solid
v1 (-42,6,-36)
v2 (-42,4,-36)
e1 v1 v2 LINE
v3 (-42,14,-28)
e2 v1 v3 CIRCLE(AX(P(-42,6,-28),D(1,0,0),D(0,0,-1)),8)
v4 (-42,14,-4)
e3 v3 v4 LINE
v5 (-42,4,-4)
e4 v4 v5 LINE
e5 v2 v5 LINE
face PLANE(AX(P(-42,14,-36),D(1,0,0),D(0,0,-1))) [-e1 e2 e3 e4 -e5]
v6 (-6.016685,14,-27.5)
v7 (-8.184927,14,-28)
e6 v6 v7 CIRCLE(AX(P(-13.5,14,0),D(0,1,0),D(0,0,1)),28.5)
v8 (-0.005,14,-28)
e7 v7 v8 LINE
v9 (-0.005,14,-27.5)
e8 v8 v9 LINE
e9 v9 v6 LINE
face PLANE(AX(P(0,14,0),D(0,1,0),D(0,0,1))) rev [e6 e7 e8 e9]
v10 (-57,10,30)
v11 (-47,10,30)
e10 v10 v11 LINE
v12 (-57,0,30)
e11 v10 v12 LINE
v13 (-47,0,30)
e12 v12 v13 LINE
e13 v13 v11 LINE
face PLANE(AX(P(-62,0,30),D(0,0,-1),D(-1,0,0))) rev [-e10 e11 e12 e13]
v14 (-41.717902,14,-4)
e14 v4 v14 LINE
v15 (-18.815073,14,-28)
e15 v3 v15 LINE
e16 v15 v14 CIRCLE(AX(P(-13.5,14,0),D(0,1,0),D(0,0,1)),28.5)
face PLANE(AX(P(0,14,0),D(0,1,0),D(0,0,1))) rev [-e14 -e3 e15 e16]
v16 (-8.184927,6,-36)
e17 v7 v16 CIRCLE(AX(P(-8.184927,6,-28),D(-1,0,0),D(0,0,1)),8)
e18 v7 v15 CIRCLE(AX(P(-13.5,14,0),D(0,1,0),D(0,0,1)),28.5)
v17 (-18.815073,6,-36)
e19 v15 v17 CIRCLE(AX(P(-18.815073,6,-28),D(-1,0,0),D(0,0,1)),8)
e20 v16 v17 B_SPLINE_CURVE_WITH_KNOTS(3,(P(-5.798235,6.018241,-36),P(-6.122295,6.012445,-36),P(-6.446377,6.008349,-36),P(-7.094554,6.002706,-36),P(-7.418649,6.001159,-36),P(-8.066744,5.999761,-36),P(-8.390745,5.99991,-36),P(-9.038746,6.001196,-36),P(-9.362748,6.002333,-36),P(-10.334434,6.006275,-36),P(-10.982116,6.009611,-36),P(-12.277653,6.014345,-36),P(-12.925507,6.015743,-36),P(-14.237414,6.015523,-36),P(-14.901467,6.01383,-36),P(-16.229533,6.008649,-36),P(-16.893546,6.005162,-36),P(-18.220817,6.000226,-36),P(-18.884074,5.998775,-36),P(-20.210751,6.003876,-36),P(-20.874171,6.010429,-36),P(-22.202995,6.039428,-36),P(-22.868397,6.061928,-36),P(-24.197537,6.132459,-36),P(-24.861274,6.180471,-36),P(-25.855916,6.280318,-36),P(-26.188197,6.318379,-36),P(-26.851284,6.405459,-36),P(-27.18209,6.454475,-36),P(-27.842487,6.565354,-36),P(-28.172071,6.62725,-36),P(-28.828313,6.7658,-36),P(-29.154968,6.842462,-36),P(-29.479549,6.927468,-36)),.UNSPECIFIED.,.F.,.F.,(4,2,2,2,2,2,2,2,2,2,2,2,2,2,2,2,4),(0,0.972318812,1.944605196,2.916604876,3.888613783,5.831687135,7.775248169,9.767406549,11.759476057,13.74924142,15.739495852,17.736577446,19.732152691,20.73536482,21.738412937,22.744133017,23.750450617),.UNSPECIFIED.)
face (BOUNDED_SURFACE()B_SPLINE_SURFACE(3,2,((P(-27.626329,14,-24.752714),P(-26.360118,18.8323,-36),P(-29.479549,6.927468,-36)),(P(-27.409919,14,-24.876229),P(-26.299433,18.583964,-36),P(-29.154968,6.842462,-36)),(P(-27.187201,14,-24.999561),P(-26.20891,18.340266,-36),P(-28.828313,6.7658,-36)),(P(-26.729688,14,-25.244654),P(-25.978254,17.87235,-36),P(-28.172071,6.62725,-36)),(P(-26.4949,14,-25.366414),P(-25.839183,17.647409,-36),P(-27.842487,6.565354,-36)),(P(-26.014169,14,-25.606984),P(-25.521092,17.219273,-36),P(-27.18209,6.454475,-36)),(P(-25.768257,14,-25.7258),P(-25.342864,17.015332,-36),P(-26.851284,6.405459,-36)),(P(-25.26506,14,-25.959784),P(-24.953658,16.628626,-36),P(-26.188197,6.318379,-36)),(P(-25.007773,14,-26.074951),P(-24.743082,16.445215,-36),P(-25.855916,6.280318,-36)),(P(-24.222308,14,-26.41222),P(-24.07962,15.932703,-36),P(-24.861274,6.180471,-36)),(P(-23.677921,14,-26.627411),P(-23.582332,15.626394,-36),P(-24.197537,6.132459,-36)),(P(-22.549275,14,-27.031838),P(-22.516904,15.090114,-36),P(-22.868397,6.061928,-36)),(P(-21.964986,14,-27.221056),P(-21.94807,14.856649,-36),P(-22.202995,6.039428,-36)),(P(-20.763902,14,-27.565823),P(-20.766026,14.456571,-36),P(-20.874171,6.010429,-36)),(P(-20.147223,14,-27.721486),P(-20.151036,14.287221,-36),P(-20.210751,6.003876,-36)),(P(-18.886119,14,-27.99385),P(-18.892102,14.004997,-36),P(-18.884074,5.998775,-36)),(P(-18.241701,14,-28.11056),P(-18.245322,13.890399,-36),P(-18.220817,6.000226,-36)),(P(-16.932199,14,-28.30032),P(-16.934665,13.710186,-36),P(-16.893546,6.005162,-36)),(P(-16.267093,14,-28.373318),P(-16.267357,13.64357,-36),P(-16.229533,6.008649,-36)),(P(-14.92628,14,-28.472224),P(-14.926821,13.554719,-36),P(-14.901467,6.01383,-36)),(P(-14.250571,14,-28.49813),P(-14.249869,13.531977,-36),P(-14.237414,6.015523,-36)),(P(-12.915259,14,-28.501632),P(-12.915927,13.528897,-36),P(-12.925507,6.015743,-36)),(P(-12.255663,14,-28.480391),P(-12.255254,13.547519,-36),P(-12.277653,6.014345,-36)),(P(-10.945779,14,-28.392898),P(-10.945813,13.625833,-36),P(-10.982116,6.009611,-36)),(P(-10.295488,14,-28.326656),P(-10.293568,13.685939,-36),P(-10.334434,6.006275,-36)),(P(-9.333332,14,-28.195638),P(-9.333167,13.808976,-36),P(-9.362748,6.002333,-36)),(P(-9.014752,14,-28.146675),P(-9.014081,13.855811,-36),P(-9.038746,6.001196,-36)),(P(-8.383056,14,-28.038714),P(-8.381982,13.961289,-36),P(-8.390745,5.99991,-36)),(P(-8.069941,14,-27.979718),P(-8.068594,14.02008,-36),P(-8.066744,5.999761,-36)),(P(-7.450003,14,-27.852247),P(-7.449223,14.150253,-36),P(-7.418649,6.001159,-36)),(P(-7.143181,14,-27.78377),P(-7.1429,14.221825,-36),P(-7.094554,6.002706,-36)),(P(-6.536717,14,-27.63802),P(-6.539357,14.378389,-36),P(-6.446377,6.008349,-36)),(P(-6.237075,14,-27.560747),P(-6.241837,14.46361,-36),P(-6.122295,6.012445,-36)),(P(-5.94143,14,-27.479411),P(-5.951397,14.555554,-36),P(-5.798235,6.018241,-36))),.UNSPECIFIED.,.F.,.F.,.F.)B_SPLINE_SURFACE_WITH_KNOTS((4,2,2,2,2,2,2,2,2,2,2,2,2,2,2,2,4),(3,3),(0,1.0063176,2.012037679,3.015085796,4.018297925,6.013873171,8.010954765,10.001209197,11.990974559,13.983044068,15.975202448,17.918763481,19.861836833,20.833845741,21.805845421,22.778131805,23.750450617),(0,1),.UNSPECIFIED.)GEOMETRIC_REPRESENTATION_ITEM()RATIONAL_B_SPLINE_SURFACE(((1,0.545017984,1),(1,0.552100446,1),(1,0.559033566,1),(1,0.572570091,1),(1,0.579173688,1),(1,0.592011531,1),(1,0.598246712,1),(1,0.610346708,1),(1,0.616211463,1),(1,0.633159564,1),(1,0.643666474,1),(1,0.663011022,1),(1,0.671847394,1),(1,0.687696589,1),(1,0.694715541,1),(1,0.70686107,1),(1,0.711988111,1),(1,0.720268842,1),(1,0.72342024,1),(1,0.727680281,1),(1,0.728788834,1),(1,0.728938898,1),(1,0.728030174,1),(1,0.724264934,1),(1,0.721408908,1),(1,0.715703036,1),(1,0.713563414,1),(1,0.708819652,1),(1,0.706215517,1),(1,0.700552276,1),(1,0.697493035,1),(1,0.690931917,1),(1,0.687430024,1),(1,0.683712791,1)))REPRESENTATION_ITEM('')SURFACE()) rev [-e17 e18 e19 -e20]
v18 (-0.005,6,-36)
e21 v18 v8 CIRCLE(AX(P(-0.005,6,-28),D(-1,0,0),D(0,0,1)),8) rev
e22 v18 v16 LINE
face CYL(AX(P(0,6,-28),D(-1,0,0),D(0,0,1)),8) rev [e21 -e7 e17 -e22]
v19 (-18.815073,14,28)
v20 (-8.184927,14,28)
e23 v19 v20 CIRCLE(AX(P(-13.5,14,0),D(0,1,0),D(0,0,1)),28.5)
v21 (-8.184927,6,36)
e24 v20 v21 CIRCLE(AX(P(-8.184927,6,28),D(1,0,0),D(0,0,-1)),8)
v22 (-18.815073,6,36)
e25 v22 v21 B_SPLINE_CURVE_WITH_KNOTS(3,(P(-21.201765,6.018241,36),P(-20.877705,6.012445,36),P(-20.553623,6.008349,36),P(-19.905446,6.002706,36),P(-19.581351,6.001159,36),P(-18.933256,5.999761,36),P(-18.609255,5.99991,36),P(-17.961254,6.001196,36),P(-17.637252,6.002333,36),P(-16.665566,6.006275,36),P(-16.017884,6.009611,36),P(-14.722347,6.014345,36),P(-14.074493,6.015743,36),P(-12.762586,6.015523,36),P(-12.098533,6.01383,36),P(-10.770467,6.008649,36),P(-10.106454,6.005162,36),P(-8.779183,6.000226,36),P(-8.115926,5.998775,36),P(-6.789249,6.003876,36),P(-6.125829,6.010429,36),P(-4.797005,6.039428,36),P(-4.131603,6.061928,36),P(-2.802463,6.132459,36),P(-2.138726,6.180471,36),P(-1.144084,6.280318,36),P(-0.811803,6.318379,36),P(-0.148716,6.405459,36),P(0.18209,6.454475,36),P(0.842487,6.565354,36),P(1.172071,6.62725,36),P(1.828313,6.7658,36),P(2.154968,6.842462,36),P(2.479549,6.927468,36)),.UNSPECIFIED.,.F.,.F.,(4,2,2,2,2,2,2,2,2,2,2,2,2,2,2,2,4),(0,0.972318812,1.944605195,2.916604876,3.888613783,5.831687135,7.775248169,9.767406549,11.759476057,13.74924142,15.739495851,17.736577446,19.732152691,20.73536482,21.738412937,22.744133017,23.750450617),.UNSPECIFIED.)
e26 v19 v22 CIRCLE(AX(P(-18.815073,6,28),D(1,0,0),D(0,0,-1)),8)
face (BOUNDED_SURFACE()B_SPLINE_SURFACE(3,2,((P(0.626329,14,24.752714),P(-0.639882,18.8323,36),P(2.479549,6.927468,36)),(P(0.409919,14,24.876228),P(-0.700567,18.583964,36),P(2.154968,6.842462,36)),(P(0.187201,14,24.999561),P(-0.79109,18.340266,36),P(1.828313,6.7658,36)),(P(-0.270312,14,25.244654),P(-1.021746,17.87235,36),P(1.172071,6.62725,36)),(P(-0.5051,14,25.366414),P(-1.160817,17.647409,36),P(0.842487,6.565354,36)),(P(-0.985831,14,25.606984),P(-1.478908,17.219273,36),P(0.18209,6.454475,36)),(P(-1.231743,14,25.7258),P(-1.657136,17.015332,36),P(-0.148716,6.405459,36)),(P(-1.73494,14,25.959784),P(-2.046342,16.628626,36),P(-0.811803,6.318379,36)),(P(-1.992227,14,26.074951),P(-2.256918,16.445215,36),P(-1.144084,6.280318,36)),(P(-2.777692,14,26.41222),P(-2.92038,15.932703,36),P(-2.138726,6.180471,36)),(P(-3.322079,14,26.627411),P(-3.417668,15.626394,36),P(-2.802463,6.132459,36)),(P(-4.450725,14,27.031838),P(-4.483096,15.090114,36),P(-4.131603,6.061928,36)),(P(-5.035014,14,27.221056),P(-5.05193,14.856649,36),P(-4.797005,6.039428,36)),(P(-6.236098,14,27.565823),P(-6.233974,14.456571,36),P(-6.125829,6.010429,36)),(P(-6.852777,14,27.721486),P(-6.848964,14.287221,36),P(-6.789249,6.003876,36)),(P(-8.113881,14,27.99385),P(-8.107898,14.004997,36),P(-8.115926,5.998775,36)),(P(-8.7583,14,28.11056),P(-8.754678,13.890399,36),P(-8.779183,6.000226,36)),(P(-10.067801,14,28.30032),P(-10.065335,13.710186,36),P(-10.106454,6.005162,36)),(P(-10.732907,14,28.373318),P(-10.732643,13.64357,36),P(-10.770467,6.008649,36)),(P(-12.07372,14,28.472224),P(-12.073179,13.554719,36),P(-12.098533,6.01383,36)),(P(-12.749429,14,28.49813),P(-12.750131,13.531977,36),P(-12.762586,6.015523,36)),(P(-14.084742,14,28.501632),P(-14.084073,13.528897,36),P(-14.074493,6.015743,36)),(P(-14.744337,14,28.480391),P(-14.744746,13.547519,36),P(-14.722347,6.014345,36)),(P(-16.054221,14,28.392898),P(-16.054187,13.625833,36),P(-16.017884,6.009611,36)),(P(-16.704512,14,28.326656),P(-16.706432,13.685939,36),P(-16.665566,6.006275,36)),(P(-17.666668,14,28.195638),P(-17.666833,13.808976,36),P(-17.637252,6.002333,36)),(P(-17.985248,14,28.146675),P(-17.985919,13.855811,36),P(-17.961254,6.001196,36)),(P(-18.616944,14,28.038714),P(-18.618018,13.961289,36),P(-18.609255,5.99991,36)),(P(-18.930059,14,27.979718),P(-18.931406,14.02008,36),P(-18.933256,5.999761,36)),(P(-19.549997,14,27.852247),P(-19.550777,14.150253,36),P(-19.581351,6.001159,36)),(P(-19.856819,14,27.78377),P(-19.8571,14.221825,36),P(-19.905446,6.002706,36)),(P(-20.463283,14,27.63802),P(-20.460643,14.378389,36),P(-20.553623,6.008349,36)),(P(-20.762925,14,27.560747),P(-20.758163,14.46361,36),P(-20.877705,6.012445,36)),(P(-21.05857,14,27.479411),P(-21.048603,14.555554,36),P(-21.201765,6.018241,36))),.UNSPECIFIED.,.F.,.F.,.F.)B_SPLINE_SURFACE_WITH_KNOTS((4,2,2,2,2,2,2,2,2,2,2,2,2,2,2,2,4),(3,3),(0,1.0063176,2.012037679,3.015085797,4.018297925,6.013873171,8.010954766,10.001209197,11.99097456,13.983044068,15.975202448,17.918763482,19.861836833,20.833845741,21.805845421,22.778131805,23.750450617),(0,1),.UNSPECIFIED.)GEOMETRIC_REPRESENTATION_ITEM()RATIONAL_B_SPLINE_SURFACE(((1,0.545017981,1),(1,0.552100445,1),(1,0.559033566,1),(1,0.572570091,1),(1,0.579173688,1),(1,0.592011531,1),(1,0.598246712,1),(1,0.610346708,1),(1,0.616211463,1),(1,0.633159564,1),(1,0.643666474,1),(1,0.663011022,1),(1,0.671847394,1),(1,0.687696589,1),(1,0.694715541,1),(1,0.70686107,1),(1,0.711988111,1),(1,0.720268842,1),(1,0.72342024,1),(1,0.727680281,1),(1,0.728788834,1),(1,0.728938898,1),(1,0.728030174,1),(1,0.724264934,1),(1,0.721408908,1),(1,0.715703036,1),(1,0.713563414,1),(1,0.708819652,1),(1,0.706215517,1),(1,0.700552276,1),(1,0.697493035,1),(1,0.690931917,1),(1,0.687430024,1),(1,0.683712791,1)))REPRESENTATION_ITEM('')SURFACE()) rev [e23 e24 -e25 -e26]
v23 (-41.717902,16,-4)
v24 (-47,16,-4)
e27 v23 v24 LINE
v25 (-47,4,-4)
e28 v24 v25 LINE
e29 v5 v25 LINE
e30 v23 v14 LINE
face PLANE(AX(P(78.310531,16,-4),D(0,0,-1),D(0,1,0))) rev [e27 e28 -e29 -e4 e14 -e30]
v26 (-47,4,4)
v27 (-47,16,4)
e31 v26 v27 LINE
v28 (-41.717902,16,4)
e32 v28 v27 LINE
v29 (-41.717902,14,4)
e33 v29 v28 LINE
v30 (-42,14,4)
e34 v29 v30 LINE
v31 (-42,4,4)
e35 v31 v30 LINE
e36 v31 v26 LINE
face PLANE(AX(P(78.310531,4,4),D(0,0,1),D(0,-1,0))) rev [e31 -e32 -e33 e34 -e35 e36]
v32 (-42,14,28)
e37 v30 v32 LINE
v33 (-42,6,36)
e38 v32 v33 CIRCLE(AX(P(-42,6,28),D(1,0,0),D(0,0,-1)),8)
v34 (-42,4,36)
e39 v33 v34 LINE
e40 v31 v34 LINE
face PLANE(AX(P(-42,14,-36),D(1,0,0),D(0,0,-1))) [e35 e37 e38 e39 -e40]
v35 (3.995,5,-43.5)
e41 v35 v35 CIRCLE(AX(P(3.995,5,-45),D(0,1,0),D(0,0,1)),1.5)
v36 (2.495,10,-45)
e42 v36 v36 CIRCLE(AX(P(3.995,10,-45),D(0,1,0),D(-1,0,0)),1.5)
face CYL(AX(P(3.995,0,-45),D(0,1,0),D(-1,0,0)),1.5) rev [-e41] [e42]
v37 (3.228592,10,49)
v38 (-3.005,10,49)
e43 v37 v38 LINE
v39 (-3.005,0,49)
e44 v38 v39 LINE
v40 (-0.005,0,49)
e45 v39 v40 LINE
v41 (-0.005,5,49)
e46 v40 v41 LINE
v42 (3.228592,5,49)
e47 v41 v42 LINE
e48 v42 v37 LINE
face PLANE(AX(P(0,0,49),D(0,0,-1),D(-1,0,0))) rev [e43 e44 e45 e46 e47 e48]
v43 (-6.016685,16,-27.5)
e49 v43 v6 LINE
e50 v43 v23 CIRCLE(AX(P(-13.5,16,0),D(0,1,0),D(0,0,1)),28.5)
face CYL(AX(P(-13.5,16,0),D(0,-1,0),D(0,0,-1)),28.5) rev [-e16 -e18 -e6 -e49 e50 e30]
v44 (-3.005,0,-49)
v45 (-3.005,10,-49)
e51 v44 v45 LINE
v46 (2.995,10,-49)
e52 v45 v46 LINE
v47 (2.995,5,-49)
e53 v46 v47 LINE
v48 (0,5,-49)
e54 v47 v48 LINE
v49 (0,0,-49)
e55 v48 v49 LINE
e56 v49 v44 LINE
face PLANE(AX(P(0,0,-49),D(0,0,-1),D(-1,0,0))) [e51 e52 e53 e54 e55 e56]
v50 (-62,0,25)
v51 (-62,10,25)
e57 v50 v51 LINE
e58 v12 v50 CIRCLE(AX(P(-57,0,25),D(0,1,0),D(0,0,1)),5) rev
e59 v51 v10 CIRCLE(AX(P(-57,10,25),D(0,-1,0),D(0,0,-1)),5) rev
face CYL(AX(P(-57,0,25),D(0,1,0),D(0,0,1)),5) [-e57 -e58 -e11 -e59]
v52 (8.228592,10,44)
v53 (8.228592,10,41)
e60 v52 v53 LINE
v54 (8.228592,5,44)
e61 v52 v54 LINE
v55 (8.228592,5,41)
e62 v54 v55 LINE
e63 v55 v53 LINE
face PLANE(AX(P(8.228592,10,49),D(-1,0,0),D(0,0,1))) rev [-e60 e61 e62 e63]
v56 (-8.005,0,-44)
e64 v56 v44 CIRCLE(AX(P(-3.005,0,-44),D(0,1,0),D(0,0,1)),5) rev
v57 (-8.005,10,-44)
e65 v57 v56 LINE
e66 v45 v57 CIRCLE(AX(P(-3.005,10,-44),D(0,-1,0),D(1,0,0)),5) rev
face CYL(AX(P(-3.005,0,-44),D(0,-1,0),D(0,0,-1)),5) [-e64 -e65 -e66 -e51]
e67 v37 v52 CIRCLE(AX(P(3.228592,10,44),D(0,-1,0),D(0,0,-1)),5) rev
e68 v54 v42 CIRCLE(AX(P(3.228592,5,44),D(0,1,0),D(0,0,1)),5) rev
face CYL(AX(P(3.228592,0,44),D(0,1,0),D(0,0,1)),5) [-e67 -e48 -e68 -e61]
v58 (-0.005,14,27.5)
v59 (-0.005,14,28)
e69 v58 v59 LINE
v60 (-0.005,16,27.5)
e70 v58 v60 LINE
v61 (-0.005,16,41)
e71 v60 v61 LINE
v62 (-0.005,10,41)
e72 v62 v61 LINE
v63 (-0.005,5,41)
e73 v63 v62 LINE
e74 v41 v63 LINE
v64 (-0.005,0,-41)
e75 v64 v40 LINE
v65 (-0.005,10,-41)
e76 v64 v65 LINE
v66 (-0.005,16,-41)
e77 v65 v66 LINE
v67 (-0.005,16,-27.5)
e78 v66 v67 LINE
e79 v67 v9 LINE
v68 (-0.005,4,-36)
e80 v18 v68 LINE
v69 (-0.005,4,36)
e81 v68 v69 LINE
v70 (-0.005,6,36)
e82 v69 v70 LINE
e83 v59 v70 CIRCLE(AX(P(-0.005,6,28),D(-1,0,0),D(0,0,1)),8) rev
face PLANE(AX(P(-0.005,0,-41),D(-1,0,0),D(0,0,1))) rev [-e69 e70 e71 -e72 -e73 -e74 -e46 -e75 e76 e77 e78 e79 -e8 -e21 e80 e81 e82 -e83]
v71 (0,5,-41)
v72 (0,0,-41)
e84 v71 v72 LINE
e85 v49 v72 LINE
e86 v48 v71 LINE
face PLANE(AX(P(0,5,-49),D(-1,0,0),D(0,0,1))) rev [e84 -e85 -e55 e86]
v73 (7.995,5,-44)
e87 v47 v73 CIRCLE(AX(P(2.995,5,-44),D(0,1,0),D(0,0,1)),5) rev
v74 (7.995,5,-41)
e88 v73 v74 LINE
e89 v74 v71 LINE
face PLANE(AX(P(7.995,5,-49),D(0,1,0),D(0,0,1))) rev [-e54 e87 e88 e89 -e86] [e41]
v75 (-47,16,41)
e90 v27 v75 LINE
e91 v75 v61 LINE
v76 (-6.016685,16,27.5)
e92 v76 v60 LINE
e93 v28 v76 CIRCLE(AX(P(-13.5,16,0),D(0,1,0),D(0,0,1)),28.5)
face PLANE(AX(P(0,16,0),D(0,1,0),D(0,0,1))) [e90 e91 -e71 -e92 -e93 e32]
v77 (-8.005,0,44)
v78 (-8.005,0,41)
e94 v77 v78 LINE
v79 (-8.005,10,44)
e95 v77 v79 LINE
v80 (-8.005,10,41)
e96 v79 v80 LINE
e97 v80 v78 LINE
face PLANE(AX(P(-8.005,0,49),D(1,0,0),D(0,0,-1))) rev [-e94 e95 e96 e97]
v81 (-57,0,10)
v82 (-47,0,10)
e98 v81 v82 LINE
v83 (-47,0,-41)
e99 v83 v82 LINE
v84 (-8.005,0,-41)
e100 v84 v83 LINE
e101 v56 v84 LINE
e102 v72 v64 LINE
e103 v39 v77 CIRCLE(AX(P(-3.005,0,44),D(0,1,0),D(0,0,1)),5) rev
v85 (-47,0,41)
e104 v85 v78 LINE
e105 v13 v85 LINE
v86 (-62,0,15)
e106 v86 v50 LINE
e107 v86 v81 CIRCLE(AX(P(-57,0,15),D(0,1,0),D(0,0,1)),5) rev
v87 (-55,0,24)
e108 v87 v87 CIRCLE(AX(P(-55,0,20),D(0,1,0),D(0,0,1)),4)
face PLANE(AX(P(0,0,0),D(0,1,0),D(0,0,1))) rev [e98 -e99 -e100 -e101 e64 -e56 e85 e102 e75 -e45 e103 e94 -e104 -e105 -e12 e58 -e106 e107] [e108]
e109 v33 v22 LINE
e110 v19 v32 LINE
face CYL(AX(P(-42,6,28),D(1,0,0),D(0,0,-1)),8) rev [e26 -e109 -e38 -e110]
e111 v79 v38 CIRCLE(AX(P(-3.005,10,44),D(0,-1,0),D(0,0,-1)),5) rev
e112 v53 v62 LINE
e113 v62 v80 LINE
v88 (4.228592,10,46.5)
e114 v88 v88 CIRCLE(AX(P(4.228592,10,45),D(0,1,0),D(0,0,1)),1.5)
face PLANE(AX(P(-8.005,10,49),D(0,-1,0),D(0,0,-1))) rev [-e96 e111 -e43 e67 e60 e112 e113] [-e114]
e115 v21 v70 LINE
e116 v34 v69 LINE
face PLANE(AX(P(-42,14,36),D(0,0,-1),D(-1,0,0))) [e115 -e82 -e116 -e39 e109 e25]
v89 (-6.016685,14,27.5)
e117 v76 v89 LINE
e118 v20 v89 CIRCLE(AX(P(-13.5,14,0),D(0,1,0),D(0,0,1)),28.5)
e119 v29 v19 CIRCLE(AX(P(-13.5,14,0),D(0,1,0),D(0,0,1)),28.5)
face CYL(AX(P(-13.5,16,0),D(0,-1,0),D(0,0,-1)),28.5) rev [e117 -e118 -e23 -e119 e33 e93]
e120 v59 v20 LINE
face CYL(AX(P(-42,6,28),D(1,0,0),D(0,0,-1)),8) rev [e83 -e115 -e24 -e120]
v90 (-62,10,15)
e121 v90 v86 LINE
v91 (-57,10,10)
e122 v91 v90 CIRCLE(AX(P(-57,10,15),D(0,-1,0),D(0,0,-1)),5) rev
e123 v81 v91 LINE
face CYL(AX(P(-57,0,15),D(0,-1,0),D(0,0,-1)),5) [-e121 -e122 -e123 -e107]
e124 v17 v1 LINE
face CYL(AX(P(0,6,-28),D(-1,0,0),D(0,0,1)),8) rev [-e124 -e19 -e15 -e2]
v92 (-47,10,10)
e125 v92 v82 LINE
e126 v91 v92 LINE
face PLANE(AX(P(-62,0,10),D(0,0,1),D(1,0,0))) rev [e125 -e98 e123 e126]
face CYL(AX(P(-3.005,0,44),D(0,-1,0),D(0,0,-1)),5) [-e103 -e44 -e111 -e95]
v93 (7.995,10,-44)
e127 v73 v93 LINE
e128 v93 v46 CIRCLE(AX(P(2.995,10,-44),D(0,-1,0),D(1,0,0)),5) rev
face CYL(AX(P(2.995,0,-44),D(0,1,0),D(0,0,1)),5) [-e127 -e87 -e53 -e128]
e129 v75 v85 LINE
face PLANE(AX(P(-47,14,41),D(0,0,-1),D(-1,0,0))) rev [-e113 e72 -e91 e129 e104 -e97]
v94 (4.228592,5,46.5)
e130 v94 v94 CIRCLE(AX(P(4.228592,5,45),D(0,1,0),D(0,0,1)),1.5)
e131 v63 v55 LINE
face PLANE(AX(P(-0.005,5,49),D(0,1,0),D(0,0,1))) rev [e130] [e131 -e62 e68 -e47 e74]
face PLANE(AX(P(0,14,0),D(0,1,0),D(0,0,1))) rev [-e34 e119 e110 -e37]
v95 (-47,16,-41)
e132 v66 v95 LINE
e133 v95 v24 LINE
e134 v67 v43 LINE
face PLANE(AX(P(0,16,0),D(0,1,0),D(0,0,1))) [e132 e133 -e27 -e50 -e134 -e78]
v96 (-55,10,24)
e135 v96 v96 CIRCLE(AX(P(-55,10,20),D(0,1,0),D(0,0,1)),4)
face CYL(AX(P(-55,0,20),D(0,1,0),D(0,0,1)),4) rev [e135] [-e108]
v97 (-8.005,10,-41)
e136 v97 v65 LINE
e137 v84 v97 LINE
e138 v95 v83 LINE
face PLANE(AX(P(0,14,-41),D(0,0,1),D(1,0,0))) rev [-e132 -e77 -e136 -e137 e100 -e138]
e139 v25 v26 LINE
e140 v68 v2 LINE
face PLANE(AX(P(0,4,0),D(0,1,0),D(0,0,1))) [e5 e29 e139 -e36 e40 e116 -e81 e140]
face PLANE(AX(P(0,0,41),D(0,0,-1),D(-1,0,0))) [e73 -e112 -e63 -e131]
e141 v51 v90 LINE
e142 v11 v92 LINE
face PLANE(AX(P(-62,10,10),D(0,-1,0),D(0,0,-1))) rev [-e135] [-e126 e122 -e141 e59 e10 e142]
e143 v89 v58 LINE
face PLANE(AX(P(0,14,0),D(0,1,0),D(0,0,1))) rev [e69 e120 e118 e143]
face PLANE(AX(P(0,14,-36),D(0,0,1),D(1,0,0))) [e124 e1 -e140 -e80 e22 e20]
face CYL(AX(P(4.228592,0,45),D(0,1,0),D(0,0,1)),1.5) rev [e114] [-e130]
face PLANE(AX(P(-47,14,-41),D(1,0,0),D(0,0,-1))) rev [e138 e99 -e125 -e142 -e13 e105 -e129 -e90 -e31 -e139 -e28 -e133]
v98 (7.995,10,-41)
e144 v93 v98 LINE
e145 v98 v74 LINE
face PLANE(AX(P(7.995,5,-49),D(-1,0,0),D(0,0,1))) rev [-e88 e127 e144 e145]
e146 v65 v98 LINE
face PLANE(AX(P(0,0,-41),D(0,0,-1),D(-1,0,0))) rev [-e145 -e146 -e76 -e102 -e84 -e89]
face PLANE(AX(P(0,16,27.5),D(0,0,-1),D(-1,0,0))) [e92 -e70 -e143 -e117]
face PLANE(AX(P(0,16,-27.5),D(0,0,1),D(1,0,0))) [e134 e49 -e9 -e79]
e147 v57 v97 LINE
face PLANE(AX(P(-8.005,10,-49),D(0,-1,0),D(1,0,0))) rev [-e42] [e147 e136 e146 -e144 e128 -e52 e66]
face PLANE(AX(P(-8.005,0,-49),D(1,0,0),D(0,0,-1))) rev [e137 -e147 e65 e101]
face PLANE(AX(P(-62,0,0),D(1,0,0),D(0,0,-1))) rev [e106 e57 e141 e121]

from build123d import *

# Parameters (mm, degrees)
BOSS_EXTRUDE2_DEPTH   = 14
CUT_EXTRUDE1_START    = -10
CUT_EXTRUDE1_DEPTH    = 93.322536556
BOSS_EXTRUDE3_DEPTH   = 2
FILLET6_R             = 8
SKETCH7_W             = 0.005
SKETCH7_H             = 82
CUT_EXTRUDE3_DEPTH    = 83.686153771
BOSS_EXTRUDE4_DEPTH   = 8
BOSS_EXTRUDE5_START   = -2
SKETCH12_W            = 8.228592419
SKETCH12_H            = 4.95
BOSS_EXTRUDE5_DEPTH   = 10
SKETCH9_R             = 1.5
CUT_EXTRUDE4_DEPTH    = 87.029065006
BOSS_EXTRUDE6_DEPTH   = 8
BOSS_EXTRUDE15_START  = -2
SKETCH15_W            = 7.945
SKETCH15_H            = 4.95
BOSS_EXTRUDE15_DEPTH  = 10
SKETCH16_R            = 1.5
CUT_EXTRUDE5_DEPTH    = 87.029065006
FILLET9_R             = 5
FILLET10_R            = 5
FILLET11_R            = 5
FILLET12_R            = 5
FILLET13_R            = 5
BOSS_EXTRUDE16_START  = -4
BOSS_EXTRUDE16_DEPTH  = 10
SKETCH18_R            = 4
CUT_EXTRUDE6_DEPTH    = 93.915997839
SKETCH19_W            = 20
SKETCH19_H            = 10
BOSS_EXTRUDE17_DEPTH  = 15
SKETCH20_R            = 4
CUT_EXTRUDE7_DEPTH    = 93.915997839
FILLET14_R            = 5
CUT_EXTRUDE9_START    = -5.282098
SKETCH21_W            = 8
SKETCH21_H            = 12
CUT_EXTRUDE9_DEPTH    = 5.282098
CROQUIS1_W            = 114.881967112
CROQUIS1_H            = 161.64199769
CORTAR_EXTRUIR2_DEPTH = 4.95
CROQUIS2_W            = 88.205530212
CROQUIS2_H            = 82
CORTAR_EXTRUIR3_DEPTH = 51.95


with BuildPart() as part:
    # Sketch1 → Boss-Extrude2 (new body)
    with BuildSketch(Plane(origin=(0, 0, 0), x_dir=(1, 0, 0), z_dir=(0, 1, 0))):
        with BuildLine():
            Line((0, 41), (-47, 41))
            Line((-47, 41), (-47, -41))
            Line((-47, -41), (0, -41))
            add(Edge.make_bspline(
                [(0, -41), (70, -41), (70, 0), (70, 41), (0, 41)],
                knots=[4.71238898, 4.71238898, 4.71238898, 6.283185307, 6.283185307, 7.853981634, 7.853981634, 7.853981634], degree=2, weights=[1, 0.707106781, 1, 0.707106781, 1]))
        make_face()
    extrude(amount=BOSS_EXTRUDE2_DEPTH)

    # Sketch3 → Cut-Extrude1 (cut, through all)
    with BuildSketch(Plane(origin=(0, 14, 0), x_dir=(1, 0, 0), z_dir=(0, 1, 0)).offset(CUT_EXTRUDE1_START)):
        with BuildLine():
            Line((0, 36), (-42, 36))
            Line((-42, 36), (-42, -36))
            Line((-42, -36), (0, -36))
            add(Edge.make_bspline(
                [(0, -36), (65, -36), (65, 0), (65, 36), (0, 36)],
                knots=[4.71238898, 4.71238898, 4.71238898, 6.283185307, 6.283185307, 7.853981634, 7.853981634, 7.853981634], degree=2, weights=[1, 0.707106781, 1, 0.707106781, 1]))
        make_face()
    extrude(amount=CUT_EXTRUDE1_DEPTH, mode=Mode.SUBTRACT)

    # Sketch5 → Boss-Extrude3 (add)
    with BuildSketch(Plane(origin=(0, 14, 0), x_dir=(1, 0, 0), z_dir=(0, 1, 0))):
        with BuildLine():
            Line((-47, 41), (-47, -41))
            Line((-47, -41), (0, -41))
            add(Edge.make_bspline(
                [(0, -41), (70, -41), (70, 0), (70, 41), (0, 41)],
                knots=[4.71238898, 4.71238898, 4.71238898, 6.283185307, 6.283185307, 7.853981634, 7.853981634, 7.853981634], degree=2, weights=[1, 0.707106781, 1, 0.707106781, 1]))
            Line((0, 41), (-47, 41))
        make_face()
        with BuildLine():
            Line((8.5, 27.5), (-6.016685226, 27.5))
            ThreePointArc((-6.016685226, 27.5), (-42, 0), (-6.016685226, -27.5))
            Line((-6.016685226, -27.5), (8.5, -27.5))
            add(Edge.make_bspline(
                [(8.5, -27.5), (58.152777778, -27.5), (58.152777778, 0), (58.152777778, 27.5), (8.5, 27.5)],
                knots=[1.570796327, 1.570796327, 1.570796327, 3.141592654, 3.141592654, 4.71238898, 4.71238898, 4.71238898], degree=2, weights=[1, 0.707106781, 1, 0.707106781, 1]))
        make_face(mode=Mode.SUBTRACT)
    extrude(amount=BOSS_EXTRUDE3_DEPTH)

    # Fillet6
    fillet6_edges = [part.edges().sort_by_distance(p)[0] for p in [
        (-21, 14, 36),
        (65, 14, 0),
        (-21, 14, -36),
    ]]
    fillet(fillet6_edges, radius=FILLET6_R)

    # Sketch7 → Cut-Extrude3 (cut, through all)
    with BuildSketch(Plane(origin=(0, 16, 0), x_dir=(1, 0, 0), z_dir=(0, 1, 0))):
        with Locations((-0.0025, 0)):
            Rectangle(SKETCH7_W, SKETCH7_H)
    extrude(amount=-CUT_EXTRUDE3_DEPTH, mode=Mode.SUBTRACT)


with BuildPart() as cut_extrude3_piece_1:
    # of the separate pieces the step leaves, piece 1, a body of its own (cut_extrude3_pieces)
    add(part.part.solids().sort_by_distance((0, 6, -36))[0])

    # Sketch12 → Boss-Extrude5 (add)
    with BuildSketch(Plane.XY.offset(41).offset(BOSS_EXTRUDE5_START)):
        with Locations((4.114296209, 2.475)):
            Rectangle(SKETCH12_W, SKETCH12_H)
    extrude(amount=BOSS_EXTRUDE5_DEPTH)


with BuildPart() as cut_extrude3_piece_2:
    # of the separate pieces the step leaves, piece 2, a body of its own (cut_extrude3_pieces)
    add(part.part.solids().sort_by_distance((-42, 14, -28))[0])

    # Sketch8 → Boss-Extrude4 (add)
    with BuildSketch(Plane.XY.offset(41)):
        Polygon((-8.005, 0), (-0.005, 0), (-0.005, 5), (8.228592419, 5), (8.228592419, 10), (0, 10), (-8.005, 10), align=None)
    extrude(amount=BOSS_EXTRUDE4_DEPTH)


with BuildPart() as cut_extrude4_tool:
    # Sketch9 → Cut-Extrude4 (new, through all)
    with BuildSketch(Plane(origin=(0, 10, 0), x_dir=(1, 0, 0), z_dir=(0, 1, 0))):
        with Locations(Location((4.228592419, -45, 0), (0, 0, 270))):
            Circle(SKETCH9_R)
    extrude(amount=-CUT_EXTRUDE4_DEPTH)


with BuildPart() as cut_extrude3_piece_1_1:
    add(cut_extrude3_piece_1.part)

    # Cut-Extrude4: cut by cut_extrude4_tool
    add(cut_extrude4_tool.part, mode=Mode.SUBTRACT)

    # Sketch15 → Boss-Extrude15 (add)
    with BuildSketch(Plane(origin=(0, 0, -41), x_dir=(-1, 0, 0), z_dir=(0, 0, -1)).offset(BOSS_EXTRUDE15_START)):
        with Locations((-4.0225, 2.475)):
            Rectangle(SKETCH15_W, SKETCH15_H)
    extrude(amount=BOSS_EXTRUDE15_DEPTH)


with BuildPart() as cut_extrude3_piece_2_1:
    add(cut_extrude3_piece_2.part)

    # Cut-Extrude4: cut by cut_extrude4_tool
    add(cut_extrude4_tool.part, mode=Mode.SUBTRACT)

    # Sketch14 → Boss-Extrude6 (add)
    with BuildSketch(Plane(origin=(0, 0, -41), x_dir=(-1, 0, 0), z_dir=(0, 0, -1))):
        Polygon((8.005, 0), (0, 0), (0, 5), (-7.995, 5), (-7.995, 10), (8.005, 10), align=None)
    extrude(amount=BOSS_EXTRUDE6_DEPTH)


with BuildPart() as cut_extrude5_tool:
    # Sketch16 → Cut-Extrude5 (new, through all)
    with BuildSketch(Plane(origin=(0, 10, 0), x_dir=(1, 0, 0), z_dir=(0, 1, 0))):
        with Locations(Location((3.995, 45, 0), (0, 0, 180))):
            Circle(SKETCH16_R)
    extrude(amount=-CUT_EXTRUDE5_DEPTH)


with BuildPart() as cut_extrude3_piece_1_2:
    add(cut_extrude3_piece_1_1.part)

    # Cut-Extrude5: cut by cut_extrude5_tool
    add(cut_extrude5_tool.part, mode=Mode.SUBTRACT)

    # Fillet10
    fillet10_edges = [cut_extrude3_piece_1_2.edges().sort_by_distance(p)[0] for p in [
        (7.995, 2.475, -49),
    ]]
    fillet(fillet10_edges, radius=FILLET10_R)

    # Fillet13
    fillet13_edges = [cut_extrude3_piece_1_2.edges().sort_by_distance(p)[0] for p in [
        (8.228592419, 2.475, 49),
    ]]
    fillet(fillet13_edges, radius=FILLET13_R)

    # Sketch13 → Boss-Extrude16 (add)
    with BuildSketch(Plane(origin=(0, 4, 0), x_dir=(1, 0, 0), z_dir=(0, 1, 0)).offset(BOSS_EXTRUDE16_START)):
        with BuildLine():
            Line((77.862579899, -17.449607958), (68.480918968, 8.495153988))
            add(Edge.make_bspline(
                [(25.721063073, -38.131875474), (80.737725462, -25.400755175), (68.480918968, 8.495153988)],
                knots=[5.088647992, 5.088647992, 5.088647992, 6.491896136, 6.491896136, 6.491896136], degree=2, weights=[1, 0.763794923, 1]))
            Line((25.721063073, -38.131875474), (72.500386182, -27.306915105))
            ThreePointArc((72.500386182, -27.306915105), (77.397822901, -23.583909635), (77.862579899, -17.449607958))
        make_face()
    extrude(amount=BOSS_EXTRUDE16_DEPTH)

    # Sketch18 → Cut-Extrude6 (cut, through all)
    with BuildSketch(Plane(origin=(0, 10, 0), x_dir=(1, 0, 0), z_dir=(0, 1, 0))):
        with Locations(Location((70.809530882, -20, 0), (0, 0, 270))):
            Circle(SKETCH18_R)
    extrude(amount=-CUT_EXTRUDE6_DEPTH, mode=Mode.SUBTRACT)

    # Croquis1 → Cortar-Extruir2 (cut)
    with BuildSketch(Plane(origin=(0, 0, 0), x_dir=(-1, 0, 0), z_dir=(0, -1, 0))):
        with Locations((-57.440983556, 31.820998845)):
            Rectangle(CROQUIS1_W, CROQUIS1_H)
    extrude(amount=-CORTAR_EXTRUIR2_DEPTH, mode=Mode.SUBTRACT)

    # Croquis2 → Cortar-Extruir3 (cut)
    with BuildSketch(Plane(origin=(0, 4.95, 0), x_dir=(-1, 0, 0), z_dir=(0, -1, 0))):
        with Locations((-44.102765106, 0)):
            Rectangle(CROQUIS2_W, CROQUIS2_H)
    extrude(amount=-CORTAR_EXTRUIR3_DEPTH, mode=Mode.SUBTRACT)


with BuildPart() as cut_extrude3_piece_2_2:
    add(cut_extrude3_piece_2_1.part)

    # Cut-Extrude5: cut by cut_extrude5_tool
    add(cut_extrude5_tool.part, mode=Mode.SUBTRACT)

    # Fillet9
    fillet9_edges = [cut_extrude3_piece_2_2.edges().sort_by_distance(p)[0] for p in [
        (7.995, 7.5, -49),
    ]]
    fillet(fillet9_edges, radius=FILLET9_R)

    # Fillet11
    fillet11_edges = [cut_extrude3_piece_2_2.edges().sort_by_distance(p)[0] for p in [
        (-8.005, 5, -49),
    ]]
    fillet(fillet11_edges, radius=FILLET11_R)

    # Fillet12
    fillet12_edges = [cut_extrude3_piece_2_2.edges().sort_by_distance(p)[0] for p in [
        (-8.005, 5, 49),
        (8.228592419, 7.5, 49),
    ]]
    fillet(fillet12_edges, radius=FILLET12_R)

    # Sketch19 → Boss-Extrude17 (add)
    with BuildSketch(Plane.ZY.offset(47)):
        with Locations((20, 5)):
            Rectangle(SKETCH19_W, SKETCH19_H)
    extrude(amount=BOSS_EXTRUDE17_DEPTH)

    # Sketch20 → Cut-Extrude7 (cut, through all)
    with BuildSketch(Plane(origin=(0, 10, 0), x_dir=(1, 0, 0), z_dir=(0, 1, 0))):
        with Locations(Location((-55, -20, 0), (0, 0, 270))):
            Circle(SKETCH20_R)
    extrude(amount=-CUT_EXTRUDE7_DEPTH, mode=Mode.SUBTRACT)

    # Fillet14
    fillet14_edges = [cut_extrude3_piece_2_2.edges().sort_by_distance(p)[0] for p in [
        (-62, 5, 10),
        (-62, 5, 30),
    ]]
    fillet(fillet14_edges, radius=FILLET14_R)

    # Sketch21 → Cut-Extrude9 (cut)
    with BuildSketch(Plane.ZY.offset(47).offset(CUT_EXTRUDE9_START)):
        with Locations((0, 10)):
            Rectangle(SKETCH21_W, SKETCH21_H)
    extrude(amount=CUT_EXTRUDE9_DEPTH, mode=Mode.SUBTRACT)


solid = cut_extrude3_piece_2_2.part
